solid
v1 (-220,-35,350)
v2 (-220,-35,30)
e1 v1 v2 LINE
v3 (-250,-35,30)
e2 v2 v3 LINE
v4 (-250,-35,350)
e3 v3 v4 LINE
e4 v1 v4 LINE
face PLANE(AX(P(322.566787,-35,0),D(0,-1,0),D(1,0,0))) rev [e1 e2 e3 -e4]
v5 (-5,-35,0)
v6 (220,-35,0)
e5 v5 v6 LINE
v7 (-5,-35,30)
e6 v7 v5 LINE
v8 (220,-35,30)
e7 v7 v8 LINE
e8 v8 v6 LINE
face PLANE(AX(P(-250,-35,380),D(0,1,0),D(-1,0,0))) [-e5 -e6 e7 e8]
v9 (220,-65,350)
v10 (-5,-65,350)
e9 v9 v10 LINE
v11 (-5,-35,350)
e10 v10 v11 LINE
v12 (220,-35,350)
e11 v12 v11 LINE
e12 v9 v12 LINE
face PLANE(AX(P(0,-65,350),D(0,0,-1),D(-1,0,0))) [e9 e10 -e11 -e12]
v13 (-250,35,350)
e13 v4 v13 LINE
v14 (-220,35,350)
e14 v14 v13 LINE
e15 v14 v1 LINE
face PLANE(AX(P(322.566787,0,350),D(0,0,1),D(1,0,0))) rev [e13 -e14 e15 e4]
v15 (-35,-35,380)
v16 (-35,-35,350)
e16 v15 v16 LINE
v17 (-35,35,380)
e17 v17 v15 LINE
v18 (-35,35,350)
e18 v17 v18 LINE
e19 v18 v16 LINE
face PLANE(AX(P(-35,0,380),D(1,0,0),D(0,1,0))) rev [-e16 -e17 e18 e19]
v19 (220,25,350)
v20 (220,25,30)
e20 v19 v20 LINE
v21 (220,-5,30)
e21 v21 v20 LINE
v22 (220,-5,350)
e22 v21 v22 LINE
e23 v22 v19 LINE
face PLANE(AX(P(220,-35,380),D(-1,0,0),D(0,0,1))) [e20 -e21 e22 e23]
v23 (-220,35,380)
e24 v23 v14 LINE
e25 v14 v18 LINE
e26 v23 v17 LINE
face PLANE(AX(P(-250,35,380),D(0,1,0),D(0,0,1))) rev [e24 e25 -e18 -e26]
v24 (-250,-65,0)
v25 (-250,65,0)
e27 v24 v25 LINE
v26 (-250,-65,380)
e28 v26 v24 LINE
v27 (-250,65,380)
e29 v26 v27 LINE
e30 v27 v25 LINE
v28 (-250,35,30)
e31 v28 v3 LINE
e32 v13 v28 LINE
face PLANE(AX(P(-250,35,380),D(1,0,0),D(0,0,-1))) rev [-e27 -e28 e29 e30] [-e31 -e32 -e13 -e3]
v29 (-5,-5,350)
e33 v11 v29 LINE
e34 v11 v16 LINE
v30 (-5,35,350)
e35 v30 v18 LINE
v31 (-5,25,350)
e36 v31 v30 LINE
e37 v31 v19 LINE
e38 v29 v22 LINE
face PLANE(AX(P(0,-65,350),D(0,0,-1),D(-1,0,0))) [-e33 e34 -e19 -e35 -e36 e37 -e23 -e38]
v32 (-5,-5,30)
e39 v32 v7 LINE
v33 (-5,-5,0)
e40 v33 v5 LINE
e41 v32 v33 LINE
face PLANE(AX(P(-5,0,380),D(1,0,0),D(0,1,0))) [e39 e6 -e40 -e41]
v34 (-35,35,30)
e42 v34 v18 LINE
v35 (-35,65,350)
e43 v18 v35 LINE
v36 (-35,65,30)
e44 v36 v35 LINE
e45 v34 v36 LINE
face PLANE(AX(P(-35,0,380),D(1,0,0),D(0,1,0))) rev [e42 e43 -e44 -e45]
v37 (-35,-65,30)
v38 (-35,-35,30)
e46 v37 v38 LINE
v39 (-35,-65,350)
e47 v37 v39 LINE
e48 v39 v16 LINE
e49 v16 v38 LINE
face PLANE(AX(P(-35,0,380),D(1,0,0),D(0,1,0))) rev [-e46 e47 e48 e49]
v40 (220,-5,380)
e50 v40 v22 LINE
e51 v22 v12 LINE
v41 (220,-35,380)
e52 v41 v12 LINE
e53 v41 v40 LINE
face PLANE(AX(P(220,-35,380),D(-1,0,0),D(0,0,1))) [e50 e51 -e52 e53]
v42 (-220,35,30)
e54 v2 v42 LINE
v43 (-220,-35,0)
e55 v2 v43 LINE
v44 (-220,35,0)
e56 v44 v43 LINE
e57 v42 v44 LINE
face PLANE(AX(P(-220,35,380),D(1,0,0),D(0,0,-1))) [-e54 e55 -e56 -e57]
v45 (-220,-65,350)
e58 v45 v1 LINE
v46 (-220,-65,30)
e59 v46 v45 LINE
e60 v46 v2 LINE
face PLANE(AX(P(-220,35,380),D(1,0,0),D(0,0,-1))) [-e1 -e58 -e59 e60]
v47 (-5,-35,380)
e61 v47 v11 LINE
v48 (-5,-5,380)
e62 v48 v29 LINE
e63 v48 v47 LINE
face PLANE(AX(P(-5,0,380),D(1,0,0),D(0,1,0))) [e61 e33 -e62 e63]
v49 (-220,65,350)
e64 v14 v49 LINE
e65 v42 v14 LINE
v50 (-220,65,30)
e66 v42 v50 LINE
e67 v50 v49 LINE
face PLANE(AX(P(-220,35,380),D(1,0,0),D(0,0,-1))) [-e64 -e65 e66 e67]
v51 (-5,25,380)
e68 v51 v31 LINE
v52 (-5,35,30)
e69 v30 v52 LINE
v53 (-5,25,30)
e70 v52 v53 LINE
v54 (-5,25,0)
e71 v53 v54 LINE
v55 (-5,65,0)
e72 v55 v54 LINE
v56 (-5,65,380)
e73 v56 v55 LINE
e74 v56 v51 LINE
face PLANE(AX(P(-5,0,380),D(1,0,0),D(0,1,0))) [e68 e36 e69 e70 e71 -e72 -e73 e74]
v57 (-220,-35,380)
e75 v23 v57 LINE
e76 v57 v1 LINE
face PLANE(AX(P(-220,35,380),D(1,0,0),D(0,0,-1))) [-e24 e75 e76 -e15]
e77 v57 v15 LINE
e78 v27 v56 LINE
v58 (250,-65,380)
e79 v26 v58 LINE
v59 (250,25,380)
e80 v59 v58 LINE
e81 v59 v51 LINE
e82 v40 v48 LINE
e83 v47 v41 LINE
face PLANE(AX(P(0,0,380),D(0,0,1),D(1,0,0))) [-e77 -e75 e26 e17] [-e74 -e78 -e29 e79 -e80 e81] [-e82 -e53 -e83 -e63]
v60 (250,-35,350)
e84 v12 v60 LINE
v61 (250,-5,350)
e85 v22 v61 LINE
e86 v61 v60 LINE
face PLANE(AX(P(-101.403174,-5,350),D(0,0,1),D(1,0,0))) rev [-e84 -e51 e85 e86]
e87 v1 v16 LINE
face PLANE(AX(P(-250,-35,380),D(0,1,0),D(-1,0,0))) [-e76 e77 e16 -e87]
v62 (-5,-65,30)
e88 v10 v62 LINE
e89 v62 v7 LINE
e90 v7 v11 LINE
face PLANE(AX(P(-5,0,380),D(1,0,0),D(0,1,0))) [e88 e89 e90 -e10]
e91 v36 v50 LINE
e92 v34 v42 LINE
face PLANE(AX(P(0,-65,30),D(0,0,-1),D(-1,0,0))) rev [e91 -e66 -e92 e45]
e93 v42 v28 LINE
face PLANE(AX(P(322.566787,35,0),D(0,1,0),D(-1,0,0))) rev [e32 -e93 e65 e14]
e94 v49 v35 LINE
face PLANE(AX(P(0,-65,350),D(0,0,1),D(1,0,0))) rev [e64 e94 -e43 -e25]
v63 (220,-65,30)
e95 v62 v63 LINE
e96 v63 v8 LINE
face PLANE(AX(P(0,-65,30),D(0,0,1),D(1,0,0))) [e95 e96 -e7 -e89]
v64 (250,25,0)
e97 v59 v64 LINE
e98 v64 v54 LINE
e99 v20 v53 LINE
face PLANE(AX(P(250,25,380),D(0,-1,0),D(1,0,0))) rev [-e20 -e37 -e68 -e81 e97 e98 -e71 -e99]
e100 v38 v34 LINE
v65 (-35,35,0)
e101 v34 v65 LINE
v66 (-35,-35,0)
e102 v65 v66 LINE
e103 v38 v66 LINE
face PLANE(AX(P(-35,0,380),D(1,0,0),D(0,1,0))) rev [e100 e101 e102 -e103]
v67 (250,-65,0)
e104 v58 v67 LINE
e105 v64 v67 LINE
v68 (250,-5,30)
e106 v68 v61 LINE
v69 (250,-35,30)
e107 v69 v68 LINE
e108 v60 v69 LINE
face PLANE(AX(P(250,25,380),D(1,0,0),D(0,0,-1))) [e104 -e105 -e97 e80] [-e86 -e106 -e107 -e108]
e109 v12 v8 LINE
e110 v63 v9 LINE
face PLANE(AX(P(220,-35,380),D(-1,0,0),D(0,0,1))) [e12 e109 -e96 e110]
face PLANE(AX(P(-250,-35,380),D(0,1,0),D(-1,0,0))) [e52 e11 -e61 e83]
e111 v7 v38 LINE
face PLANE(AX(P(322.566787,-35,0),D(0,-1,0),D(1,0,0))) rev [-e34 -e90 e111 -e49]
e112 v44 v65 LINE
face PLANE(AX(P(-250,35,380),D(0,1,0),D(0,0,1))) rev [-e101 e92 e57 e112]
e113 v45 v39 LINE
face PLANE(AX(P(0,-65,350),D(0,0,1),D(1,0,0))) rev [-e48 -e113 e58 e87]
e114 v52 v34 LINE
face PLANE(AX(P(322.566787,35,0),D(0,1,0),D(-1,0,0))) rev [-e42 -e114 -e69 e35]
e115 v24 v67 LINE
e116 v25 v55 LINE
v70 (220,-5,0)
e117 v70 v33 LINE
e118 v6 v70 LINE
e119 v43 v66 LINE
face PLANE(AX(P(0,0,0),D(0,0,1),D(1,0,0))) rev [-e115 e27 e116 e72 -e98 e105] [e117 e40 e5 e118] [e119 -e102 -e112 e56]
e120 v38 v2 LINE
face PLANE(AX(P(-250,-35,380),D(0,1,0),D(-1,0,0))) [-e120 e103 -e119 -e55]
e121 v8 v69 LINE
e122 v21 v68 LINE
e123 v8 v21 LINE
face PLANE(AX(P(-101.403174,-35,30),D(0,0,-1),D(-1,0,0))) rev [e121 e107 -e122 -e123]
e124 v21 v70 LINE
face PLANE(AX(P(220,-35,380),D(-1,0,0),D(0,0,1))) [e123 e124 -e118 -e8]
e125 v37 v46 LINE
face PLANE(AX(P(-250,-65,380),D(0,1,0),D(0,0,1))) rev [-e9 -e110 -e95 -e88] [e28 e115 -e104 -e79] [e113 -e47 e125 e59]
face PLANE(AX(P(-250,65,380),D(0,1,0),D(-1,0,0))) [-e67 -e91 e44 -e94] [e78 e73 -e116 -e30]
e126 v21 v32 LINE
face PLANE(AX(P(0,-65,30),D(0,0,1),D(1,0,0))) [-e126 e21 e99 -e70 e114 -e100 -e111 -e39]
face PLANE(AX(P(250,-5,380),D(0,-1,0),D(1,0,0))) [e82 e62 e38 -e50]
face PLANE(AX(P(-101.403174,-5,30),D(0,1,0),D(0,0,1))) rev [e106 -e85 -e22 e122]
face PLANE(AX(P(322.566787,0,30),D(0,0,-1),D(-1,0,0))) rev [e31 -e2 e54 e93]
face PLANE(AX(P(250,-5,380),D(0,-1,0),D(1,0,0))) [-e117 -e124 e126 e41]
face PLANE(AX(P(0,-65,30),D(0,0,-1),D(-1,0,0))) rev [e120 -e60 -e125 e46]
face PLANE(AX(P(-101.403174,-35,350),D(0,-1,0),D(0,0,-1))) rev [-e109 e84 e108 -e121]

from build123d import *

# Parameters (mm, degrees)
SKETCH1_W                = 185
SKETCH1_H                = 70
SKETCH1_W_2              = 225
SKETCH1_H_2              = 30
BOSS_EXTRUDE1_DEPTH      = 380
CUT_EXTRUDE1_START       = -130
CUT_EXTRUDE1_OUTLINE_W   = 225
CUT_EXTRUDE1_OUTLINE_H   = 320
CUT_EXTRUDE1_OUTLINE_W_2 = 185
CUT_EXTRUDE1_DEPTH       = 130
SKETCH3_W                = 320
SKETCH3_H                = 30
CUT_EXTRUDE2_DEPTH       = 30
SKETCH4_W                = 320
SKETCH4_H                = 70
CUT_EXTRUDE3_DEPTH       = 245


# Read off the part's stored shape, not the designer's step: Cut-Extrude1
with BuildPart() as part:
    # Sketch1 → Boss-Extrude1 (new body)
    with BuildSketch(Plane.XY):
        Polygon((250, 25), (-5, 25), (-5, 65), (-250, 65), (-250, -65), (250, -65), align=None)
        with Locations((-127.5, 0)):
            Rectangle(SKETCH1_W, SKETCH1_H, mode=Mode.SUBTRACT)
        with Locations((107.5, -20)):
            Rectangle(SKETCH1_W_2, SKETCH1_H_2, mode=Mode.SUBTRACT)
    extrude(amount=BOSS_EXTRUDE1_DEPTH)

    # Cut-Extrude1 outline → Cut-Extrude1 (cut)
    with BuildSketch(Plane(origin=(0, 65, 0), x_dir=(1, 0, 0), z_dir=(0, 1, 0)).offset(CUT_EXTRUDE1_START)):
        with Locations((107.5, -190)):
            Rectangle(CUT_EXTRUDE1_OUTLINE_W, CUT_EXTRUDE1_OUTLINE_H)
        with Locations((-127.5, -190)):
            Rectangle(CUT_EXTRUDE1_OUTLINE_W_2, CUT_EXTRUDE1_OUTLINE_H)
    extrude(amount=CUT_EXTRUDE1_DEPTH, mode=Mode.SUBTRACT)

    # Sketch3 → Cut-Extrude2 (cut)
    with BuildSketch(Plane(origin=(250, 0, 0), x_dir=(0, 0, -1), z_dir=(1, 0, 0))):
        with Locations((-190, -20)):
            Rectangle(SKETCH3_W, SKETCH3_H)
    extrude(amount=-CUT_EXTRUDE2_DEPTH, mode=Mode.SUBTRACT)

    # Sketch4 → Cut-Extrude3 (cut)
    with BuildSketch(Plane.ZY.offset(250)):
        with Locations((190, 0)):
            Rectangle(SKETCH4_W, SKETCH4_H)
    extrude(amount=-CUT_EXTRUDE3_DEPTH, mode=Mode.SUBTRACT)


solid = part.part
